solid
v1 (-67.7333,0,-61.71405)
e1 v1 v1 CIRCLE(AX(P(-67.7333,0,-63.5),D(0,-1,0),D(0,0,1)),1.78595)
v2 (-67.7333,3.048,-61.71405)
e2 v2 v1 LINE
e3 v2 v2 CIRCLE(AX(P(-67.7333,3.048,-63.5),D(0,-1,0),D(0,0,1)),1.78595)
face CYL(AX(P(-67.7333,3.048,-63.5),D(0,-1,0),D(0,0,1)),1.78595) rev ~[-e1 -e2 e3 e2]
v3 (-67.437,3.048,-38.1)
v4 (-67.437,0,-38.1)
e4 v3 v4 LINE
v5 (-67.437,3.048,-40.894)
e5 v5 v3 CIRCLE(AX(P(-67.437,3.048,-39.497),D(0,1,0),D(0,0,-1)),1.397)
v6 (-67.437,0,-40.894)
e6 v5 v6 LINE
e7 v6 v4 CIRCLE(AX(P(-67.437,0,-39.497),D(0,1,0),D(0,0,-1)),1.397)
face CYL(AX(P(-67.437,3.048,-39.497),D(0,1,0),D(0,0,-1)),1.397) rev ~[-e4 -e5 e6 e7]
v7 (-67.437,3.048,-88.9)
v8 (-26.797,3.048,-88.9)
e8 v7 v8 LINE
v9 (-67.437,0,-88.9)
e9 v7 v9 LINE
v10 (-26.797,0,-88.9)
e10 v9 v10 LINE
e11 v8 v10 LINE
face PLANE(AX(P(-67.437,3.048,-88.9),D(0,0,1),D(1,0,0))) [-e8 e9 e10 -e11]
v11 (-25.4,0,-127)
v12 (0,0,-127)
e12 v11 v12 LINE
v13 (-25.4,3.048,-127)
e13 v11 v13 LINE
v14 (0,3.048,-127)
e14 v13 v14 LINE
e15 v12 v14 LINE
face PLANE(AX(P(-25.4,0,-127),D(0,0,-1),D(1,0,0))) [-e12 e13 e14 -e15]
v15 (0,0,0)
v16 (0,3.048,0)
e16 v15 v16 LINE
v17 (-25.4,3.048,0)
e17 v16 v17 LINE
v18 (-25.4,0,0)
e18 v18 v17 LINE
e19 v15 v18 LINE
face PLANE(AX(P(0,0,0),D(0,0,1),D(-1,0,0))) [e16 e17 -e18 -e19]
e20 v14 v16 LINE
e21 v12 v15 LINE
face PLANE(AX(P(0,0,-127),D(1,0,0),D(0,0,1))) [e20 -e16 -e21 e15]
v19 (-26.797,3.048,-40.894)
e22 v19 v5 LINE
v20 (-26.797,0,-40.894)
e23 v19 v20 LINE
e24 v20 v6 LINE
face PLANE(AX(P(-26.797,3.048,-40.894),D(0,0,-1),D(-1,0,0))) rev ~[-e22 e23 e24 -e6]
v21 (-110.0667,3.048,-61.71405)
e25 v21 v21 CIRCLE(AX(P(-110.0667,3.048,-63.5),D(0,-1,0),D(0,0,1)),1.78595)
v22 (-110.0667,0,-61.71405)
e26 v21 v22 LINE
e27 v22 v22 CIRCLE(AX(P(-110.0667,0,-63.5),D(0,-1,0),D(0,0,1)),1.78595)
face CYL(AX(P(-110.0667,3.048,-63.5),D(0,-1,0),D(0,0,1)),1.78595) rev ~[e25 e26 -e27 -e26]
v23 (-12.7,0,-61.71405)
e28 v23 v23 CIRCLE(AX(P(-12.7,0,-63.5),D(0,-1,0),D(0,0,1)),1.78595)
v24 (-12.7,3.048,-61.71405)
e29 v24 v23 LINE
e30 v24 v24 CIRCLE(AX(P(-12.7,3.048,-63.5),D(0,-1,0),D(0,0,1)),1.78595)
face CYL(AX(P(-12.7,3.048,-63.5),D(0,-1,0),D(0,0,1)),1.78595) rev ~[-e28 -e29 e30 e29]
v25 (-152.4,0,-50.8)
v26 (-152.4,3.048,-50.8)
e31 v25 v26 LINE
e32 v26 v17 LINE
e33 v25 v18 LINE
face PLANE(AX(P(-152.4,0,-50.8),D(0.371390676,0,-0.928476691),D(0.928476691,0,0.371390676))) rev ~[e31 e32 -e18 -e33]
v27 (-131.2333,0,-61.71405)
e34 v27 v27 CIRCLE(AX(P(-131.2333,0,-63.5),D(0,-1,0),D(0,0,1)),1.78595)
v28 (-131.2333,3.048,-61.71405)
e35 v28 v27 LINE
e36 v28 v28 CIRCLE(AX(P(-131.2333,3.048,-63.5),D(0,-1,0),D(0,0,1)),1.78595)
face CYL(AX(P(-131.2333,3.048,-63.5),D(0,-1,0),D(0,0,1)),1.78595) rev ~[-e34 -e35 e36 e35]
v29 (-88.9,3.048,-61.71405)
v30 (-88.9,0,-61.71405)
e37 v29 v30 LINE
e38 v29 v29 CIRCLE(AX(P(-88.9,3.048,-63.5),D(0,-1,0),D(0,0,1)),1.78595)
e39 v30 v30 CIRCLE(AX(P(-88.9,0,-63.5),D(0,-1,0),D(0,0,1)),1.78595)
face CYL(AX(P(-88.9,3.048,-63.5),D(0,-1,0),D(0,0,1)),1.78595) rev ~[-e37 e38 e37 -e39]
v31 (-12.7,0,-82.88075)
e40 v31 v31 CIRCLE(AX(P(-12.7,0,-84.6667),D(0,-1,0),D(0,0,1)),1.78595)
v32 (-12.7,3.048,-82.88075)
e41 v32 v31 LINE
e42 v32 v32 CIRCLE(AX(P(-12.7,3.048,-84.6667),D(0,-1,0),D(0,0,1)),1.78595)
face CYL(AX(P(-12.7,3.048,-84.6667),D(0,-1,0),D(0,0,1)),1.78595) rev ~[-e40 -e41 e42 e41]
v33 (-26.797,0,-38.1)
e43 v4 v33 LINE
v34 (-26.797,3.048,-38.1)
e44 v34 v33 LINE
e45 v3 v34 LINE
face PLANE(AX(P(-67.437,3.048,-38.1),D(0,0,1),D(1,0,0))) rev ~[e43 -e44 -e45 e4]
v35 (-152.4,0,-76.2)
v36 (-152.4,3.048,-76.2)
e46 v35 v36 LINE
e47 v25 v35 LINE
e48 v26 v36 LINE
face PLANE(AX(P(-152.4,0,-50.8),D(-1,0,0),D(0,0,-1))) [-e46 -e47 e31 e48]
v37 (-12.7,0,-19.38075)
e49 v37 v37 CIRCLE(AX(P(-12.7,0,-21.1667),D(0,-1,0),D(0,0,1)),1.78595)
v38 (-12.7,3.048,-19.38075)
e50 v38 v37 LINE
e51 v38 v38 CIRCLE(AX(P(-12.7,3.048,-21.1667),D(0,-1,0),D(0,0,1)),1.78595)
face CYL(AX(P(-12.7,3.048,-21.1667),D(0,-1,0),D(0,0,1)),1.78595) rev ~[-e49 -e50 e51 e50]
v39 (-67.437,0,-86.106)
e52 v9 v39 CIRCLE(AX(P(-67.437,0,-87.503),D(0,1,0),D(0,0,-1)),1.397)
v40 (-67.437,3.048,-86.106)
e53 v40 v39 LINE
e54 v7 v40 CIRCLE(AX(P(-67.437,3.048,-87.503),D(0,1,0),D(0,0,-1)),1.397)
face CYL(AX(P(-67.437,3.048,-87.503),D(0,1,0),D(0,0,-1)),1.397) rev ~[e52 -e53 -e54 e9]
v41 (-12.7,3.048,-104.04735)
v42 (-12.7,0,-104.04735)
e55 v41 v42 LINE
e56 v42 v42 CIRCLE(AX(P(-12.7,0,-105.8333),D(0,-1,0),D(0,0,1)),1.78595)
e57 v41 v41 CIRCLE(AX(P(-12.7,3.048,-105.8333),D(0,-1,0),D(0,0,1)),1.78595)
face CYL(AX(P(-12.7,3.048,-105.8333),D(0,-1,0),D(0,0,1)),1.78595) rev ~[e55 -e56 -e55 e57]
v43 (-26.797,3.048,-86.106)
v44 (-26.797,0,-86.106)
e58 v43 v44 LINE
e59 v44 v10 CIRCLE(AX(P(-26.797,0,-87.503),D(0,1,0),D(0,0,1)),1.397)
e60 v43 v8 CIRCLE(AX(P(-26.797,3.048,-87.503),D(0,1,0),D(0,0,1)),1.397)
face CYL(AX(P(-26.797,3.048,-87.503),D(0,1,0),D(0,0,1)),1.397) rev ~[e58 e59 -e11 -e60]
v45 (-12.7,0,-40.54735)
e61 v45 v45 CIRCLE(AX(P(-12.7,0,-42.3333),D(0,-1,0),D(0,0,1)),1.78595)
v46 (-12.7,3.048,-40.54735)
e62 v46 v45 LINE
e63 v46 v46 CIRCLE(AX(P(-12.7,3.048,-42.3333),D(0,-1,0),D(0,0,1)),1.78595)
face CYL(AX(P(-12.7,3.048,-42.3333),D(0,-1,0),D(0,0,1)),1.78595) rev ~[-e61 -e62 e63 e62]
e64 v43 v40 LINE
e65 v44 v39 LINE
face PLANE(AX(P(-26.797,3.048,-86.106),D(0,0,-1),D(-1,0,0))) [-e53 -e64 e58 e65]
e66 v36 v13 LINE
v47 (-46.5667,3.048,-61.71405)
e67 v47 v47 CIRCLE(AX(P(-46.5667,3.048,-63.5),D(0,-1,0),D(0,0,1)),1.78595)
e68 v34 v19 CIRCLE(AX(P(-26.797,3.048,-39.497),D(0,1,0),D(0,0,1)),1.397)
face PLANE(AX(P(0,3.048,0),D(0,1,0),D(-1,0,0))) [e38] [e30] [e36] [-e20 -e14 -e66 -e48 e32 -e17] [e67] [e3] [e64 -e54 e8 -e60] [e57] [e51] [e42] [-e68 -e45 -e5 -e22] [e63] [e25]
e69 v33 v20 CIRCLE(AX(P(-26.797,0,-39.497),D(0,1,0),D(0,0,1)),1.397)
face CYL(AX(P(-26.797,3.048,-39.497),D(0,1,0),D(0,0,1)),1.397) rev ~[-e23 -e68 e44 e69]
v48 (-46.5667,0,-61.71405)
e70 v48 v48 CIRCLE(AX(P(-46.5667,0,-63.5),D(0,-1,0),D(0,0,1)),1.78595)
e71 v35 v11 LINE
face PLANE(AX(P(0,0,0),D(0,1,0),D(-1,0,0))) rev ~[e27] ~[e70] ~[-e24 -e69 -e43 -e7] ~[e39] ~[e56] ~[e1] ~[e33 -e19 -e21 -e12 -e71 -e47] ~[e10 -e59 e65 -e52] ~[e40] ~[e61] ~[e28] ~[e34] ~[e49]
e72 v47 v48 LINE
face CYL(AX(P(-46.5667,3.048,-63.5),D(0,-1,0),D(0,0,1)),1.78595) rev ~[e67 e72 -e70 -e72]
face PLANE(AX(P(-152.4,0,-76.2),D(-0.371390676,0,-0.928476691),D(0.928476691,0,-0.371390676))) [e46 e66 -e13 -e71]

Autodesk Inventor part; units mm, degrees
ref_plane "YZ Plane" through (0, 0, 0) normal (1, 0, 0) x (0, 1, 0)
ref_plane "XZ Plane" through (0, 0, 0) normal (0, 1, 0) x (-1, 0, 0)
ref_plane "XY Plane" through (0, 0, 0) normal (0, 0, 1) x (1, 0, 0)
sketch "face_sketch" plane through (0, 0, 0) normal (0, 1, 0) x (-1, 0, 0)
  line L0 (0, 0) -> (25.4, 0)
  line L1 (25.4, 0) -> (25.4, -127)
  line L2 (25.4, -127) -> (0, -127)
  line L3 (0, -127) -> (0, 0)
  line L4 (25.4, -50.8) -> (152.4, -50.8)
  line L5 (152.4, -50.8) -> (152.4, -76.2)
  line L6 (152.4, -76.2) -> (25.4, -76.2)
  line L7 (25.4, -76.2) -> (25.4, -50.8)
  line L8 (152.4, -50.8) -> (25.4, 0)
  line L9 (152.4, -76.2) -> (25.4, -127)
  dimension "d0" = 25.4
  dimension "d1" = 127
  dimension "d2" = 127
  dimension "d3" = 25.4
extrude "Plate1" add sketch "face_sketch" along normal blind 3.048
sketch "rivet_holes_sketch" plane through (0, 3.048, 0) normal (0, 1, 0) x (1, 0, 0)
  line L0 (-25.4, 0) -> (-152.4, 50.8) projected
  line L1 (0, 0) -> (-25.4, 0) projected
  line L2 (0, 127) -> (0, 0) projected
  line L3 (-25.4, 127) -> (0, 127) projected
  line L4 (-152.4, 76.2) -> (-25.4, 127) projected
  line L5 (-152.4, 50.8) -> (-152.4, 76.2) projected
  line L6 (-25.4, 127) -> (-25.4, 0) construction
  line L7 (0, 127) -> (-25.4, 127) construction
  line L8 (-25.4, 0) -> (0, 0) construction
  line L9 (-152.4, 76.2) -> (-152.4, 50.8) construction
  line L10 (-152.4, 63.5) -> (-131.2333, 63.5) construction
  line L11 (-131.2333, 63.5) -> (-110.0667, 63.5) construction
  line L12 (-110.0667, 63.5) -> (-88.9, 63.5) construction
  line L13 (-88.9, 63.5) -> (-67.7333, 63.5) construction
  line L14 (-67.7333, 63.5) -> (-46.5667, 63.5) construction
  line L15 (-46.5667, 63.5) -> (-25.4, 63.5) construction
  line L16 (-12.7, 0) -> (-12.7, 21.1667) construction
  line L17 (-12.7, 21.1667) -> (-12.7, 42.3333) construction
  line L18 (-12.7, 42.3333) -> (-12.7, 63.5) construction
  line L19 (-12.7, 63.5) -> (-12.7, 84.6667) construction
  line L20 (-12.7, 84.6667) -> (-12.7, 105.8333) construction
  line L21 (-12.7, 105.8333) -> (-12.7, 127) construction
hole "rivet_holes" at (-131.2333, 3.048, -63.5) at (-110.0667, 3.048, -63.5) at (-88.9, 3.048, -63.5) at (-67.7333, 3.048, -63.5) at (-46.5667, 3.048, -63.5) at (-12.7, 3.048, -21.1667) at (-12.7, 3.048, -42.3333) at (-12.7, 3.048, -63.5) at (-12.7, 3.048, -84.6667) at (-12.7, 3.048, -105.8333) direction (0, -1, 0) diameter 3.5719 depth 3.048 tip angle 118
sketch "hm_mounting_slot_sketch" plane through (0, 3.048, 0) normal (0, 1, 0) x (1, 0, 0)
  line L0 (-67.437, 87.503) -> (-26.797, 87.503) construction
  line L1 (-67.437, 88.9) -> (-26.797, 88.9)
  line L2 (-26.797, 86.106) -> (-67.437, 86.106)
  arc A0 (-67.437, 88.9) -> (-67.437, 86.106) centre (-67.437, 87.503) ccw
  arc A1 (-26.797, 86.106) -> (-26.797, 88.9) centre (-26.797, 87.503) ccw
  line L3 (-67.437, 39.497) -> (-26.797, 39.497) construction
  line L4 (-67.437, 38.1) -> (-26.797, 38.1)
  line L5 (-26.797, 40.894) -> (-67.437, 40.894)
  arc A2 (-67.437, 40.894) -> (-67.437, 38.1) centre (-67.437, 39.497) ccw
  arc A3 (-26.797, 38.1) -> (-26.797, 40.894) centre (-26.797, 39.497) ccw
  line L6 (-25.4, 0) -> (-25.4, 127) construction
  line L7 (-68.834, 87.503) -> (-68.834, 109.6264) construction
  line L8 (-25.4, 127) -> (-152.4, 76.2) projected
  line L9 (-68.834, 39.497) -> (-68.834, 17.3736) construction
  line L10 (-152.4, 50.8) -> (-25.4, 0) projected
  point P0 (0, 0)
  point P1 (-47.117, 87.503)
  point P2 (-47.117, 39.497)
  point P3 (-25.4, 39.497)
  point P4 (-25.4, 87.503)
  point P5 (-68.834, 28.4353)
  dimension "d12" = 40.64
  dimension "d14" = 2.794
  dimension "d15" = 40.64
  dimension "d16" = 2.794
  dimension "d17" = 50.8
extrude "Cut1" cut sketch "hm_mounting_slot_sketch" against normal blind 3.048
equation "\"d5\" = rv_hole_diameter"
equation "\"d10\" = Thickness"
equation "\"d12\" = tb_hm_mounting_slot_length"
equation "\"d15\" = tb_hm_mounting_slot_length"
equation "\"d17\" = hm_base_length"
equation "\"d18\" = Thickness"
equation "\"d0\" = st_outer_diameter"
equation "\"d1\" = tb_rivet_row_length"
equation "\"d2\" = tb_rivet_row_length"
equation "\"d3\" = st_outer_diameter"
equation "\"Thickness\" = tb_metal_thickness"
equation "\"BendRadius\" = Thickness"
equation "\"BendReliefWidth\" = Thickness"
equation "\"BendReliefDepth\" = 0.5 * Thickness"
equation "\"CornerReliefSize\" = 4 * Thickness"
equation "\"MinimumRemnant\" = 2 * Thickness"
equation "\"TransitionRadius\" = BendRadius"
equation "\"JacobiRadiusSize\" = BendRadius"
equation "\"GapSize\" = Thickness"
equation "\"bp_thickness\" = 3.048"
equation "\"bp_height\" = gb_mh_seperation + st_outer_diameter"
equation "\"bp_width\" = 4 * st_rivet_distance"
equation "\"bp_axle_height\" = magic_axle_offset + gb_axle_from_edge + gb_to_bottom_of_side_assembly"
equation "\"magic_axle_offset\" = 2.286"
equation "\"bp_tensioner_width\" = 6.35"
equation "\"bp_tensioner_height\" = 50.8"
equation "\"bp_tensioner_from_bottom\" = 38.1"
equation "\"bp_tensioner_from_side\" = 25.4"
equation "\"bp_tensioner_wood_mount_from_tensioner_top\" = 12.7"
equation "\"bp_tensioner_wood_mount_diameter\" = 6.35"
equation "\"gb_mh_seperation\" = 111.1504"
equation "\"gb_mh_diameter\" = 6.35"
equation "\"gb_axle_from_edge\" = 38.1"
equation "\"gb_width\" = 127"
equation "\"gb_bearing_diameter\" = 28.575"
equation "\"gb_to_bottom_of_side_assembly\" = 4.7752"
equation "\"rv_hole_diameter\" = 3.57187"
equation "\"st_outer_diameter\" = 25.4"
equation "\"st_wall_thickness\" = 1.5875"
equation "\"st_length\" = 685.8"
equation "\"st_gbmh_from_center\" = 0.5 * gb_mh_seperation"
equation "\"st_cutout_depth_right\" = 203.2"
equation "\"st_cutout_depth_left\" = 203.2"
equation "\"st_rivet_distance\" = 19.05"
equation "\"so_inner_diameter\" = 7.62"
equation "\"so_wall_thickness\" = 5.08"
equation "\"so_length\" = 40.64"
equation "\"twb_width\" = st_outer_diameter"
equation "\"twb_length\" = bp_tensioner_width + 2 * twb_margin_on_each_side"
equation "\"twb_height\" = 2 * bp_tensioner_wood_mount_diameter + bp_tensioner_height + 2 * bp_tensioner_wood_mount_from_tensioner_top + twb_margin_on_each_side"
equation "\"twb_margin_on_each_side\" = 6.35"
equation "\"twb_tensioner_from_edge\" = -0.5 * bp_tensioner_height + 0.5 * twb_height"
equation "\"tb_side_length\" = 127"
equation "\"tb_rivet_row_length\" = 127"
equation "\"d4\" = BendRadius"
equation "\"tb_metal_thickness\" = 3.048"
equation "\"tb_hm_mounting_slot_length\" = 40.64"
equation "\"hm_base_width\" = 30.48"
equation "\"hm_base_length\" = 50.8"
equation "\"hm_moon_flange_radius\" = 17.78"
equation "\"hm_moon_channel_offset\" = 2.286"
equation "\"hm_moon_flange_width\" = 5.08"
equation "\"hm_moon_thickness\" = 5.08"
equation "\"hm_base_height\" = 5.08"
equation "\"hm_peg_width\" = 2.54"
equation "\"hm_peg_length\" = 5.08"
equation "\"hm_peg_height\" = 5.08"
equation "\"hm_rivet_groove_width\" = 10.16"
equation "\"hm_rivet_groove_height\" = 1.27"
equation "\"gb_mh_seperation_alt\" = 111.125"
equation "\"gb_axle_from_edge_alt\" = 43.1546"
equation "\"bp_axle_height_alt\" = magic_axle_offset + gb_axle_from_edge_alt + gb_to_bottom_of_side_assembly"
properties part number "traingle_bracket(tb)" material "Aluminum 6061"
